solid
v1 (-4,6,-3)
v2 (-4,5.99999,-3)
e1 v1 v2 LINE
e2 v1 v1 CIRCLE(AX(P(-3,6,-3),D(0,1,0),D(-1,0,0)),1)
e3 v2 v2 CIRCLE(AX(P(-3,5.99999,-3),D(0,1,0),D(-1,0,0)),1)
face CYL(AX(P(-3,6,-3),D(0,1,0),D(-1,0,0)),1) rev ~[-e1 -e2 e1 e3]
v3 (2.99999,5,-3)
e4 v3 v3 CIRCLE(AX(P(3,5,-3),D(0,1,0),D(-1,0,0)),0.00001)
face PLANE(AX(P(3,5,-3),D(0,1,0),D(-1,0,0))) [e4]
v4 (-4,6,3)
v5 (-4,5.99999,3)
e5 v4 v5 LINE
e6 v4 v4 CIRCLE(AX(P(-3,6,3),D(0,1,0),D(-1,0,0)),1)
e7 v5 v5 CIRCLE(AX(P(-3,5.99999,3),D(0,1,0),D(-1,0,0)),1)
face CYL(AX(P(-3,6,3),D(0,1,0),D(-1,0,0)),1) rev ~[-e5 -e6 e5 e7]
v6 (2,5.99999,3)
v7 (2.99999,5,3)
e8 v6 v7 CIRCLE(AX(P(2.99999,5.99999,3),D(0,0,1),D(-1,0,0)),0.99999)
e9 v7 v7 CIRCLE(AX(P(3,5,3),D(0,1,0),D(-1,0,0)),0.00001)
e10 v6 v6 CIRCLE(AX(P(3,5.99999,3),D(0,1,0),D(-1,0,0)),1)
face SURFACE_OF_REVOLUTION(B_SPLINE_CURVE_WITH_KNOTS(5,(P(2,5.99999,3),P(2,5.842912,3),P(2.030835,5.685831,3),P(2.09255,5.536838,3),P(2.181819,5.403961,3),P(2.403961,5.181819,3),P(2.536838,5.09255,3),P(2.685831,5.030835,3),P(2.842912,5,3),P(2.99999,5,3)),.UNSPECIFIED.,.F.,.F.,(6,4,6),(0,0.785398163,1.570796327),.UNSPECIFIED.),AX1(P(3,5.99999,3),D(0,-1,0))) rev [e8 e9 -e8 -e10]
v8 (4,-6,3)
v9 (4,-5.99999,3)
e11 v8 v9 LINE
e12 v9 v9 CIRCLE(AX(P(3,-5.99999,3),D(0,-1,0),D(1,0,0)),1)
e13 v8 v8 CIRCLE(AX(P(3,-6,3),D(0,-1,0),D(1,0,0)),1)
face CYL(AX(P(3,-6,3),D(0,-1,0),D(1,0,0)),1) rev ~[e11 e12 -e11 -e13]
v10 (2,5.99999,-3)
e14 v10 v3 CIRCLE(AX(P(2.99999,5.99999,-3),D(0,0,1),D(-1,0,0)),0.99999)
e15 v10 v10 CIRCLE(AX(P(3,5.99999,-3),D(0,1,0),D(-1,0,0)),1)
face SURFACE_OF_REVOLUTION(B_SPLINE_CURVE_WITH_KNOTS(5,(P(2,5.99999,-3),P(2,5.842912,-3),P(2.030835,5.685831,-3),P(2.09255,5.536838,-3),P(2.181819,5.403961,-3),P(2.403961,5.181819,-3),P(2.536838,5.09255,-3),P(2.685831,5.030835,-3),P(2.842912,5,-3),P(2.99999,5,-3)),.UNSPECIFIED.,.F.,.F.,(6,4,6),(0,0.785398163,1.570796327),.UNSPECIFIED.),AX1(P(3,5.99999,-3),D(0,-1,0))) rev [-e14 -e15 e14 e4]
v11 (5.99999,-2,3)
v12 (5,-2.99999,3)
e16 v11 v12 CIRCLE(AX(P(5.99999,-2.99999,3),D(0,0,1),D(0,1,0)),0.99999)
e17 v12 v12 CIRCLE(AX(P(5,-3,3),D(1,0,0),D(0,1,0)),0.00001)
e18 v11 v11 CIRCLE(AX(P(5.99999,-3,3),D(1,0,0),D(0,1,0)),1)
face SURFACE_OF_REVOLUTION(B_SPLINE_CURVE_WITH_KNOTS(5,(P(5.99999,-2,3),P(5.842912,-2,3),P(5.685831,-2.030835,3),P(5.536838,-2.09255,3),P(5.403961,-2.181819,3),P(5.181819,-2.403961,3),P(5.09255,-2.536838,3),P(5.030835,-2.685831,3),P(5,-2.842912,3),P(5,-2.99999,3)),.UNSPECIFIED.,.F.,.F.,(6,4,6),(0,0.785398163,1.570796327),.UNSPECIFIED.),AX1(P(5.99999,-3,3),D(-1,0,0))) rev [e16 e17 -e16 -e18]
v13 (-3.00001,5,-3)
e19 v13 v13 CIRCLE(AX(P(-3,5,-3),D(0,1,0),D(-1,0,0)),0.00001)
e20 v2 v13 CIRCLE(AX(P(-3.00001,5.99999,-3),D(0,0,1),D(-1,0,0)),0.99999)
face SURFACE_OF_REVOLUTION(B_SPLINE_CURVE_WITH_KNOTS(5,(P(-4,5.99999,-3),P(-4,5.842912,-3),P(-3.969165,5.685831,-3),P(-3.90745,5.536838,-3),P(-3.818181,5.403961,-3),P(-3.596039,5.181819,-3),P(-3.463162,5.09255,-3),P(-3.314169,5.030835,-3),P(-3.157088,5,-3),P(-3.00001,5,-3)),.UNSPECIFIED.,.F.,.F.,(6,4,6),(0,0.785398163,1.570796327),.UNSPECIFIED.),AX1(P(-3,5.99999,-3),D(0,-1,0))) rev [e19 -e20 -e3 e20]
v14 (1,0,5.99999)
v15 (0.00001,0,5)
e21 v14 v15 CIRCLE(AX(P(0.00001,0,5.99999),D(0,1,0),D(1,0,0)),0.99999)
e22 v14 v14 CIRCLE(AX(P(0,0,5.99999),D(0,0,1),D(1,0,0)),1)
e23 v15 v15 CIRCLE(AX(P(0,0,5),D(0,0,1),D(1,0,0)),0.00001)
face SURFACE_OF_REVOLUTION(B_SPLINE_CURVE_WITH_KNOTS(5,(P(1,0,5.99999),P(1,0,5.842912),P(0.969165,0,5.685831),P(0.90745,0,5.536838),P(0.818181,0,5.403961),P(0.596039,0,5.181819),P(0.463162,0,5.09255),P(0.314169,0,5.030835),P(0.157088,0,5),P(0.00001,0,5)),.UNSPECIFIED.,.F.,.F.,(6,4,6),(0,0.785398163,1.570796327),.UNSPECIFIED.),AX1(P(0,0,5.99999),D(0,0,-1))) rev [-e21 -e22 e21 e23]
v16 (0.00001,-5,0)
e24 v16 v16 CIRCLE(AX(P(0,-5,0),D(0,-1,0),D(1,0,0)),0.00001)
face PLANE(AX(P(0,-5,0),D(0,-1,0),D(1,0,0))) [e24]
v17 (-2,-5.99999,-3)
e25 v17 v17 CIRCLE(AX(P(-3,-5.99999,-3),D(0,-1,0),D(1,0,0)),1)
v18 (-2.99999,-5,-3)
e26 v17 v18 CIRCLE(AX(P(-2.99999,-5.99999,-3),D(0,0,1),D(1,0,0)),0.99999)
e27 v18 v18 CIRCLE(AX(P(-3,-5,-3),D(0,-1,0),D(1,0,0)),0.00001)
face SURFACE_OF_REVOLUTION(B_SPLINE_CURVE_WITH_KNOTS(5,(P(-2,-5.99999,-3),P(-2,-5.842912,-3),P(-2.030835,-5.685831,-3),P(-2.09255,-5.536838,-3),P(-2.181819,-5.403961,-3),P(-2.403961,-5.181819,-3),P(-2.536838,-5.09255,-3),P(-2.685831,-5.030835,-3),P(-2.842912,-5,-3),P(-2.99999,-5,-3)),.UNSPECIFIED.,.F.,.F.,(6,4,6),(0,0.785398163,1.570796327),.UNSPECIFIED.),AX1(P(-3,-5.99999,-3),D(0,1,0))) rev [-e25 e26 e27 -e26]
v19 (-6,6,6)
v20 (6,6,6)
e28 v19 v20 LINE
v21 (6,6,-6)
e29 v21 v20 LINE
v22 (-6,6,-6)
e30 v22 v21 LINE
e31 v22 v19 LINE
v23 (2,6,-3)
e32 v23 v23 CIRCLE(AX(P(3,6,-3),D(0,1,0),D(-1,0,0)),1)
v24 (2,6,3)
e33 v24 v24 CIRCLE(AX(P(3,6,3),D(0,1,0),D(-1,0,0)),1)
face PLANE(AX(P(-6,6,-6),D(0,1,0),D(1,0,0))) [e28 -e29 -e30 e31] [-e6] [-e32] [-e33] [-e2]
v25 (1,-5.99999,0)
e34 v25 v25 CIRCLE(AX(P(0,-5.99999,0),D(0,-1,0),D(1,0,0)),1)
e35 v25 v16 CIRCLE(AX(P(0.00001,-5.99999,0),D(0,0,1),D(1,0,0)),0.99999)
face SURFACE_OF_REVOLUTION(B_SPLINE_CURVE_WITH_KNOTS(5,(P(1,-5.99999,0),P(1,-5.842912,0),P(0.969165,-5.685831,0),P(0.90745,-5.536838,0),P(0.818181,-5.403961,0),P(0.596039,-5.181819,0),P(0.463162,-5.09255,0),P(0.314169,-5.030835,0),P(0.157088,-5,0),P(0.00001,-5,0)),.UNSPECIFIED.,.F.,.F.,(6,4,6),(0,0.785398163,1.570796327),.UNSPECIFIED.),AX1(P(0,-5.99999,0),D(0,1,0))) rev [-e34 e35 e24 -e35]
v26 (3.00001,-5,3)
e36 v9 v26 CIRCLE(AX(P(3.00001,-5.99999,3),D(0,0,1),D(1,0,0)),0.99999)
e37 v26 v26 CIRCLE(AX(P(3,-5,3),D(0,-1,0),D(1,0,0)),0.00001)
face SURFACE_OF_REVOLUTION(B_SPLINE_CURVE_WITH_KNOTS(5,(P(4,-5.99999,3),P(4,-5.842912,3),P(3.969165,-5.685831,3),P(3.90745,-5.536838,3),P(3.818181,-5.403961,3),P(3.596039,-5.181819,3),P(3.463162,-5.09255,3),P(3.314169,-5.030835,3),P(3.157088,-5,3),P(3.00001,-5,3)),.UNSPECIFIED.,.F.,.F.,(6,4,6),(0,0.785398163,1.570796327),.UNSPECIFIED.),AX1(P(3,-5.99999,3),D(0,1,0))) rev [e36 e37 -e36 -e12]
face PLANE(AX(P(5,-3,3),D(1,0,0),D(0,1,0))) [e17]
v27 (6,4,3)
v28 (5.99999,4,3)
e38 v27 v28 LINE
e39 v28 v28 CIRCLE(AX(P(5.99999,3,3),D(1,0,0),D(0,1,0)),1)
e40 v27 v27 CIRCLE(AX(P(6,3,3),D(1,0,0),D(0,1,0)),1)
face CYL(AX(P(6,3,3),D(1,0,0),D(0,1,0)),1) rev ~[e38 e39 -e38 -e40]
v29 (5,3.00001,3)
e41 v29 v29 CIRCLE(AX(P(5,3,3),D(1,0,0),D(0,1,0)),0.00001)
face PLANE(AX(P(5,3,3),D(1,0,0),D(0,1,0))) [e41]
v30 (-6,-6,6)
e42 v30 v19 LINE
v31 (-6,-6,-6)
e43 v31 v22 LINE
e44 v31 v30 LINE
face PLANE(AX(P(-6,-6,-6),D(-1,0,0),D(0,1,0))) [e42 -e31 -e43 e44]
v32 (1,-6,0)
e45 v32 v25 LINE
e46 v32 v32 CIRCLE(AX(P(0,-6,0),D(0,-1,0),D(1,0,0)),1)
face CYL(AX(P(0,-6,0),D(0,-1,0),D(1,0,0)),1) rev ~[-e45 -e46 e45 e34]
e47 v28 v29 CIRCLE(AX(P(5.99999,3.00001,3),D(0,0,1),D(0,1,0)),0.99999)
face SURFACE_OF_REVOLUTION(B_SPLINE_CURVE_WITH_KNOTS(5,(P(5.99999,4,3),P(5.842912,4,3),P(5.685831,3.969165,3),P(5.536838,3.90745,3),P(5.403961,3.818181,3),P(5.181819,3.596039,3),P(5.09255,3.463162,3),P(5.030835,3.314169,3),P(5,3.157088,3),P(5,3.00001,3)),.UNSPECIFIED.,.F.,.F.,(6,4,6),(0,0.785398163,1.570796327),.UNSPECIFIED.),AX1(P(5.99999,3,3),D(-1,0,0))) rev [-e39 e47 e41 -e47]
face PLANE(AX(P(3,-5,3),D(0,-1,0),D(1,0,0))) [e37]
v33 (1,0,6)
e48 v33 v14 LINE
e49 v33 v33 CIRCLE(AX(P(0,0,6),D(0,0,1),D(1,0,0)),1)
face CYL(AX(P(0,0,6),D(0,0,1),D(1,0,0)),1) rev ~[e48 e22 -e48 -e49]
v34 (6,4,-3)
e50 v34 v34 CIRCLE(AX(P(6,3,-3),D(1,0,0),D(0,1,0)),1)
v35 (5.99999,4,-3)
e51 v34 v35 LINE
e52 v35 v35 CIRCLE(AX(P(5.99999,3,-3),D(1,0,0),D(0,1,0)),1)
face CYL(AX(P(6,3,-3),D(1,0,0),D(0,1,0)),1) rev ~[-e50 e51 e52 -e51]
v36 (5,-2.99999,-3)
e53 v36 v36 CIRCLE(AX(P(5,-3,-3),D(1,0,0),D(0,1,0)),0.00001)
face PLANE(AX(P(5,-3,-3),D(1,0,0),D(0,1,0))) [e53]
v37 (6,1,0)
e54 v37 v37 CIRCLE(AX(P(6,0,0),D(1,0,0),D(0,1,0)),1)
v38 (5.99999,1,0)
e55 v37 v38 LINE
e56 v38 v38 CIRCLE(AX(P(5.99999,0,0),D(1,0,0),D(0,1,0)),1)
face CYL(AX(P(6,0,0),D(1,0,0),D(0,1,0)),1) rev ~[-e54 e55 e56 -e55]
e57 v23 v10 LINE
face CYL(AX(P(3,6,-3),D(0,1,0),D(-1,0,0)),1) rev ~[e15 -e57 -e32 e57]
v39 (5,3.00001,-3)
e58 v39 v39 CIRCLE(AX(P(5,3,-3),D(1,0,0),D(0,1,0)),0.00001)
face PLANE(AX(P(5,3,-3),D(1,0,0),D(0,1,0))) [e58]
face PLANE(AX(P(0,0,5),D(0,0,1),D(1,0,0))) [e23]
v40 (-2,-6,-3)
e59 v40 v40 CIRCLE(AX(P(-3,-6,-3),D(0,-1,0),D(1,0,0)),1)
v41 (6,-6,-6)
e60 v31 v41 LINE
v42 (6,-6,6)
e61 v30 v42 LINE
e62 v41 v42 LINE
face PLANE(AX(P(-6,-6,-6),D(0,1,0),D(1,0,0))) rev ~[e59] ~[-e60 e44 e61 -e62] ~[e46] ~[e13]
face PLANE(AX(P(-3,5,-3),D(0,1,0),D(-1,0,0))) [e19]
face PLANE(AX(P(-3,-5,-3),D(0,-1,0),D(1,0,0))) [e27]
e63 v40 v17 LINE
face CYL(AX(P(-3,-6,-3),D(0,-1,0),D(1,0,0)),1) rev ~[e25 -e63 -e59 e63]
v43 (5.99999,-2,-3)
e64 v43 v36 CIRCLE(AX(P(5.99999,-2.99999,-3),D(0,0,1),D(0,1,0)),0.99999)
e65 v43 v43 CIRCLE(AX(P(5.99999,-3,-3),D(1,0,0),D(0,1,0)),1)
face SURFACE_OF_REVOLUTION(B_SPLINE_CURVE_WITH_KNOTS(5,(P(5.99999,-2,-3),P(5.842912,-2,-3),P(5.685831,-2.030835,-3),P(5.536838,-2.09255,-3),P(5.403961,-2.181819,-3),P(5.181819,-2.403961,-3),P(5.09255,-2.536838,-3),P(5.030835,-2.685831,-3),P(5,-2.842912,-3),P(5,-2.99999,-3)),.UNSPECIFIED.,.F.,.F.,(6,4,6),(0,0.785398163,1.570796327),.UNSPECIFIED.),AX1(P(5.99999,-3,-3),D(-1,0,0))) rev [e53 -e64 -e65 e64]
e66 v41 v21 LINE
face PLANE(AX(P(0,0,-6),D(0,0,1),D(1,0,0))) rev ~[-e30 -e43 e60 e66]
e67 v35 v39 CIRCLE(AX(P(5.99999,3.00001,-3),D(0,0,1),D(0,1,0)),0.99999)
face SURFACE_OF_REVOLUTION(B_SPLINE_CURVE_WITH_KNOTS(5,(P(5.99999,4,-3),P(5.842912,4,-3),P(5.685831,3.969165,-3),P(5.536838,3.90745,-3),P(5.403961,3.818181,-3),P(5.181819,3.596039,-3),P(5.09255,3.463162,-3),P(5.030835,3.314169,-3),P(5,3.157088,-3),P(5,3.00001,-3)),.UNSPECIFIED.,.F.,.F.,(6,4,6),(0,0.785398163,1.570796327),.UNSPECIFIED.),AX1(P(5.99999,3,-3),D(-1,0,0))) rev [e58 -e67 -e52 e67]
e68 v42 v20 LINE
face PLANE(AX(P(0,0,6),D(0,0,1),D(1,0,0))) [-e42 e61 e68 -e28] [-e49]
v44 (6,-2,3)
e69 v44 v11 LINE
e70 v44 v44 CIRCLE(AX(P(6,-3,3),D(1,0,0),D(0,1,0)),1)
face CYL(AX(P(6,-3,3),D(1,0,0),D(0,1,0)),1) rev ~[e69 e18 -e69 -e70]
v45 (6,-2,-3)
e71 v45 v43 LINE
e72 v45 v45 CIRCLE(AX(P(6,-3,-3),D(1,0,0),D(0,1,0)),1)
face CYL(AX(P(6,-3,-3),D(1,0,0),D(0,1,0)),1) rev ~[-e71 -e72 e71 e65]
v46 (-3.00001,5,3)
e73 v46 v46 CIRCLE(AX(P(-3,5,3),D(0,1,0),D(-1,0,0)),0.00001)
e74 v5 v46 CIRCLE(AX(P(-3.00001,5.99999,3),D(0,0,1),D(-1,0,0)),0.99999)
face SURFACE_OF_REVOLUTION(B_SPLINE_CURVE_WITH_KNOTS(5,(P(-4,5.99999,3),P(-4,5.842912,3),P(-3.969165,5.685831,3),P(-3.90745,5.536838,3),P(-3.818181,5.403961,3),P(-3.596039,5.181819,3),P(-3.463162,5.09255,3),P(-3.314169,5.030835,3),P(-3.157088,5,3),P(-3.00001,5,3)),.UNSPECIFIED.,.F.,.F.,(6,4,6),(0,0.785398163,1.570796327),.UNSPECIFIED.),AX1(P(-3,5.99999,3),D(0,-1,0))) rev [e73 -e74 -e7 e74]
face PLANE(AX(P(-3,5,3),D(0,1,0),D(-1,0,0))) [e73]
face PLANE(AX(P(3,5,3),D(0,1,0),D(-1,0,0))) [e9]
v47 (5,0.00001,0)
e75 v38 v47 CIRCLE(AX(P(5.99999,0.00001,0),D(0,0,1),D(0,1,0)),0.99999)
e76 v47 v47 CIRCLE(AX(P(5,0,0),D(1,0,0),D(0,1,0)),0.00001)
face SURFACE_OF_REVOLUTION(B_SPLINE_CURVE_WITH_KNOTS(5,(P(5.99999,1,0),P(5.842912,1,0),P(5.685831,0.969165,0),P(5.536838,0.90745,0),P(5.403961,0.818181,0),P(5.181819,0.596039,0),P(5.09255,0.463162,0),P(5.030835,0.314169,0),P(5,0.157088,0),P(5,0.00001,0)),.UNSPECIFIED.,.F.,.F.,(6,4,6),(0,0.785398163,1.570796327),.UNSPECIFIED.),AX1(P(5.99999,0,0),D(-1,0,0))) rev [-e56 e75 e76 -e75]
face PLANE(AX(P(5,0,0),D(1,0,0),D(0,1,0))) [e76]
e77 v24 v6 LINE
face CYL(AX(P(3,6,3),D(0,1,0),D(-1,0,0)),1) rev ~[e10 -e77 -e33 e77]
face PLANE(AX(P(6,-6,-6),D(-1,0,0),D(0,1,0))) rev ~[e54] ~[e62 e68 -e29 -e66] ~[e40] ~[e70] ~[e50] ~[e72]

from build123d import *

# Parameters (mm, degrees)
F1_W      = 12
F1_H      = 12
F2_DEPTH  = 12
F3_R      = 1
F4_DEPTH  = 1
F5_R      = 0.99999
F6_R      = 1
F7_DEPTH  = 1
F8_R      = 0.99999
F9_R      = 1
F10_DEPTH = 1
F11_R     = 0.99999
F12_R     = 1
F13_DEPTH = 1
F14_R     = 0.99999


# Not quite as in the source:
# - a fillet or chamfer is up to 0.001 mm smaller than in the source, because OpenCascade refuses the exact size


with BuildPart() as f2:
    # F1 (on offset) → F2 (new body)
    with BuildSketch(Plane.XY.offset(-6)):
        Rectangle(F1_W, F1_H)
    extrude(amount=F2_DEPTH)

    # F3 (on face) → F4 (cut)
    with BuildSketch(Plane.XY.offset(6)):
        Circle(F3_R)
    extrude(amount=-F4_DEPTH, mode=Mode.SUBTRACT)

    # F5 (radius 1 in the source; OpenCascade refuses exactly that, so slightly less here)
    f5_edges = [f2.edges().sort_by_distance(p)[0] for p in [
        (-1, 0, 5),
    ]]
    fillet(f5_edges, radius=F5_R)

    # F6 (on face) → F7 (cut)
    with BuildSketch(Plane.XZ.offset(6)):
        with Locations((3, 3)):
            Circle(F6_R)
        Circle(F6_R)
        with Locations((-3, -3)):
            Circle(F6_R)
    extrude(amount=-F7_DEPTH, mode=Mode.SUBTRACT)

    # F8 (radius 1 in the source; OpenCascade refuses exactly that, so slightly less here)
    f8_edges = [f2.edges().sort_by_distance(p)[0] for p in [
        (2, -5, 3),
        (-1, -5, 0),
        (-4, -5, -3),
    ]]
    fillet(f8_edges, radius=F8_R)

    # F9 (on face) → F10 (cut)
    with BuildSketch(Plane.YZ.offset(6)):
        with Locations((-3, 3)):
            Circle(F9_R)
        Circle(F9_R)
        with Locations((3, 3)):
            Circle(F9_R)
        with Locations((3, -3)):
            Circle(F9_R)
        with Locations((-3, -3)):
            Circle(F9_R)
    extrude(amount=-F10_DEPTH, mode=Mode.SUBTRACT)

    # F11 (radius 1 in the source; OpenCascade refuses exactly that, so slightly less here)
    f11_edges = [f2.edges().sort_by_distance(p)[0] for p in [
        (5, -4, 3),
        (5, -1, 0),
        (5, 2, 3),
        (5, 2, -3),
        (5, -4, -3),
    ]]
    fillet(f11_edges, radius=F11_R)

    # F12 (on face) → F13 (cut)
    with BuildSketch(Plane(origin=(0, 6, 0), x_dir=(-1, 0, 0), z_dir=(0, 1, 0))):
        with Locations((-3, 3)):
            Circle(F12_R)
        with Locations((3, 3)):
            Circle(F12_R)
        with Locations((3, -3)):
            Circle(F12_R)
        with Locations((-3, -3)):
            Circle(F12_R)
    extrude(amount=-F13_DEPTH, mode=Mode.SUBTRACT)

    # F14 (radius 1 in the source; OpenCascade refuses exactly that, so slightly less here)
    f14_edges = [f2.edges().sort_by_distance(p)[0] for p in [
        (4, 5, 3),
        (-2, 5, 3),
        (4, 5, -3),
        (-2, 5, -3),
    ]]
    fillet(f14_edges, radius=F14_R)


solid = f2.part
